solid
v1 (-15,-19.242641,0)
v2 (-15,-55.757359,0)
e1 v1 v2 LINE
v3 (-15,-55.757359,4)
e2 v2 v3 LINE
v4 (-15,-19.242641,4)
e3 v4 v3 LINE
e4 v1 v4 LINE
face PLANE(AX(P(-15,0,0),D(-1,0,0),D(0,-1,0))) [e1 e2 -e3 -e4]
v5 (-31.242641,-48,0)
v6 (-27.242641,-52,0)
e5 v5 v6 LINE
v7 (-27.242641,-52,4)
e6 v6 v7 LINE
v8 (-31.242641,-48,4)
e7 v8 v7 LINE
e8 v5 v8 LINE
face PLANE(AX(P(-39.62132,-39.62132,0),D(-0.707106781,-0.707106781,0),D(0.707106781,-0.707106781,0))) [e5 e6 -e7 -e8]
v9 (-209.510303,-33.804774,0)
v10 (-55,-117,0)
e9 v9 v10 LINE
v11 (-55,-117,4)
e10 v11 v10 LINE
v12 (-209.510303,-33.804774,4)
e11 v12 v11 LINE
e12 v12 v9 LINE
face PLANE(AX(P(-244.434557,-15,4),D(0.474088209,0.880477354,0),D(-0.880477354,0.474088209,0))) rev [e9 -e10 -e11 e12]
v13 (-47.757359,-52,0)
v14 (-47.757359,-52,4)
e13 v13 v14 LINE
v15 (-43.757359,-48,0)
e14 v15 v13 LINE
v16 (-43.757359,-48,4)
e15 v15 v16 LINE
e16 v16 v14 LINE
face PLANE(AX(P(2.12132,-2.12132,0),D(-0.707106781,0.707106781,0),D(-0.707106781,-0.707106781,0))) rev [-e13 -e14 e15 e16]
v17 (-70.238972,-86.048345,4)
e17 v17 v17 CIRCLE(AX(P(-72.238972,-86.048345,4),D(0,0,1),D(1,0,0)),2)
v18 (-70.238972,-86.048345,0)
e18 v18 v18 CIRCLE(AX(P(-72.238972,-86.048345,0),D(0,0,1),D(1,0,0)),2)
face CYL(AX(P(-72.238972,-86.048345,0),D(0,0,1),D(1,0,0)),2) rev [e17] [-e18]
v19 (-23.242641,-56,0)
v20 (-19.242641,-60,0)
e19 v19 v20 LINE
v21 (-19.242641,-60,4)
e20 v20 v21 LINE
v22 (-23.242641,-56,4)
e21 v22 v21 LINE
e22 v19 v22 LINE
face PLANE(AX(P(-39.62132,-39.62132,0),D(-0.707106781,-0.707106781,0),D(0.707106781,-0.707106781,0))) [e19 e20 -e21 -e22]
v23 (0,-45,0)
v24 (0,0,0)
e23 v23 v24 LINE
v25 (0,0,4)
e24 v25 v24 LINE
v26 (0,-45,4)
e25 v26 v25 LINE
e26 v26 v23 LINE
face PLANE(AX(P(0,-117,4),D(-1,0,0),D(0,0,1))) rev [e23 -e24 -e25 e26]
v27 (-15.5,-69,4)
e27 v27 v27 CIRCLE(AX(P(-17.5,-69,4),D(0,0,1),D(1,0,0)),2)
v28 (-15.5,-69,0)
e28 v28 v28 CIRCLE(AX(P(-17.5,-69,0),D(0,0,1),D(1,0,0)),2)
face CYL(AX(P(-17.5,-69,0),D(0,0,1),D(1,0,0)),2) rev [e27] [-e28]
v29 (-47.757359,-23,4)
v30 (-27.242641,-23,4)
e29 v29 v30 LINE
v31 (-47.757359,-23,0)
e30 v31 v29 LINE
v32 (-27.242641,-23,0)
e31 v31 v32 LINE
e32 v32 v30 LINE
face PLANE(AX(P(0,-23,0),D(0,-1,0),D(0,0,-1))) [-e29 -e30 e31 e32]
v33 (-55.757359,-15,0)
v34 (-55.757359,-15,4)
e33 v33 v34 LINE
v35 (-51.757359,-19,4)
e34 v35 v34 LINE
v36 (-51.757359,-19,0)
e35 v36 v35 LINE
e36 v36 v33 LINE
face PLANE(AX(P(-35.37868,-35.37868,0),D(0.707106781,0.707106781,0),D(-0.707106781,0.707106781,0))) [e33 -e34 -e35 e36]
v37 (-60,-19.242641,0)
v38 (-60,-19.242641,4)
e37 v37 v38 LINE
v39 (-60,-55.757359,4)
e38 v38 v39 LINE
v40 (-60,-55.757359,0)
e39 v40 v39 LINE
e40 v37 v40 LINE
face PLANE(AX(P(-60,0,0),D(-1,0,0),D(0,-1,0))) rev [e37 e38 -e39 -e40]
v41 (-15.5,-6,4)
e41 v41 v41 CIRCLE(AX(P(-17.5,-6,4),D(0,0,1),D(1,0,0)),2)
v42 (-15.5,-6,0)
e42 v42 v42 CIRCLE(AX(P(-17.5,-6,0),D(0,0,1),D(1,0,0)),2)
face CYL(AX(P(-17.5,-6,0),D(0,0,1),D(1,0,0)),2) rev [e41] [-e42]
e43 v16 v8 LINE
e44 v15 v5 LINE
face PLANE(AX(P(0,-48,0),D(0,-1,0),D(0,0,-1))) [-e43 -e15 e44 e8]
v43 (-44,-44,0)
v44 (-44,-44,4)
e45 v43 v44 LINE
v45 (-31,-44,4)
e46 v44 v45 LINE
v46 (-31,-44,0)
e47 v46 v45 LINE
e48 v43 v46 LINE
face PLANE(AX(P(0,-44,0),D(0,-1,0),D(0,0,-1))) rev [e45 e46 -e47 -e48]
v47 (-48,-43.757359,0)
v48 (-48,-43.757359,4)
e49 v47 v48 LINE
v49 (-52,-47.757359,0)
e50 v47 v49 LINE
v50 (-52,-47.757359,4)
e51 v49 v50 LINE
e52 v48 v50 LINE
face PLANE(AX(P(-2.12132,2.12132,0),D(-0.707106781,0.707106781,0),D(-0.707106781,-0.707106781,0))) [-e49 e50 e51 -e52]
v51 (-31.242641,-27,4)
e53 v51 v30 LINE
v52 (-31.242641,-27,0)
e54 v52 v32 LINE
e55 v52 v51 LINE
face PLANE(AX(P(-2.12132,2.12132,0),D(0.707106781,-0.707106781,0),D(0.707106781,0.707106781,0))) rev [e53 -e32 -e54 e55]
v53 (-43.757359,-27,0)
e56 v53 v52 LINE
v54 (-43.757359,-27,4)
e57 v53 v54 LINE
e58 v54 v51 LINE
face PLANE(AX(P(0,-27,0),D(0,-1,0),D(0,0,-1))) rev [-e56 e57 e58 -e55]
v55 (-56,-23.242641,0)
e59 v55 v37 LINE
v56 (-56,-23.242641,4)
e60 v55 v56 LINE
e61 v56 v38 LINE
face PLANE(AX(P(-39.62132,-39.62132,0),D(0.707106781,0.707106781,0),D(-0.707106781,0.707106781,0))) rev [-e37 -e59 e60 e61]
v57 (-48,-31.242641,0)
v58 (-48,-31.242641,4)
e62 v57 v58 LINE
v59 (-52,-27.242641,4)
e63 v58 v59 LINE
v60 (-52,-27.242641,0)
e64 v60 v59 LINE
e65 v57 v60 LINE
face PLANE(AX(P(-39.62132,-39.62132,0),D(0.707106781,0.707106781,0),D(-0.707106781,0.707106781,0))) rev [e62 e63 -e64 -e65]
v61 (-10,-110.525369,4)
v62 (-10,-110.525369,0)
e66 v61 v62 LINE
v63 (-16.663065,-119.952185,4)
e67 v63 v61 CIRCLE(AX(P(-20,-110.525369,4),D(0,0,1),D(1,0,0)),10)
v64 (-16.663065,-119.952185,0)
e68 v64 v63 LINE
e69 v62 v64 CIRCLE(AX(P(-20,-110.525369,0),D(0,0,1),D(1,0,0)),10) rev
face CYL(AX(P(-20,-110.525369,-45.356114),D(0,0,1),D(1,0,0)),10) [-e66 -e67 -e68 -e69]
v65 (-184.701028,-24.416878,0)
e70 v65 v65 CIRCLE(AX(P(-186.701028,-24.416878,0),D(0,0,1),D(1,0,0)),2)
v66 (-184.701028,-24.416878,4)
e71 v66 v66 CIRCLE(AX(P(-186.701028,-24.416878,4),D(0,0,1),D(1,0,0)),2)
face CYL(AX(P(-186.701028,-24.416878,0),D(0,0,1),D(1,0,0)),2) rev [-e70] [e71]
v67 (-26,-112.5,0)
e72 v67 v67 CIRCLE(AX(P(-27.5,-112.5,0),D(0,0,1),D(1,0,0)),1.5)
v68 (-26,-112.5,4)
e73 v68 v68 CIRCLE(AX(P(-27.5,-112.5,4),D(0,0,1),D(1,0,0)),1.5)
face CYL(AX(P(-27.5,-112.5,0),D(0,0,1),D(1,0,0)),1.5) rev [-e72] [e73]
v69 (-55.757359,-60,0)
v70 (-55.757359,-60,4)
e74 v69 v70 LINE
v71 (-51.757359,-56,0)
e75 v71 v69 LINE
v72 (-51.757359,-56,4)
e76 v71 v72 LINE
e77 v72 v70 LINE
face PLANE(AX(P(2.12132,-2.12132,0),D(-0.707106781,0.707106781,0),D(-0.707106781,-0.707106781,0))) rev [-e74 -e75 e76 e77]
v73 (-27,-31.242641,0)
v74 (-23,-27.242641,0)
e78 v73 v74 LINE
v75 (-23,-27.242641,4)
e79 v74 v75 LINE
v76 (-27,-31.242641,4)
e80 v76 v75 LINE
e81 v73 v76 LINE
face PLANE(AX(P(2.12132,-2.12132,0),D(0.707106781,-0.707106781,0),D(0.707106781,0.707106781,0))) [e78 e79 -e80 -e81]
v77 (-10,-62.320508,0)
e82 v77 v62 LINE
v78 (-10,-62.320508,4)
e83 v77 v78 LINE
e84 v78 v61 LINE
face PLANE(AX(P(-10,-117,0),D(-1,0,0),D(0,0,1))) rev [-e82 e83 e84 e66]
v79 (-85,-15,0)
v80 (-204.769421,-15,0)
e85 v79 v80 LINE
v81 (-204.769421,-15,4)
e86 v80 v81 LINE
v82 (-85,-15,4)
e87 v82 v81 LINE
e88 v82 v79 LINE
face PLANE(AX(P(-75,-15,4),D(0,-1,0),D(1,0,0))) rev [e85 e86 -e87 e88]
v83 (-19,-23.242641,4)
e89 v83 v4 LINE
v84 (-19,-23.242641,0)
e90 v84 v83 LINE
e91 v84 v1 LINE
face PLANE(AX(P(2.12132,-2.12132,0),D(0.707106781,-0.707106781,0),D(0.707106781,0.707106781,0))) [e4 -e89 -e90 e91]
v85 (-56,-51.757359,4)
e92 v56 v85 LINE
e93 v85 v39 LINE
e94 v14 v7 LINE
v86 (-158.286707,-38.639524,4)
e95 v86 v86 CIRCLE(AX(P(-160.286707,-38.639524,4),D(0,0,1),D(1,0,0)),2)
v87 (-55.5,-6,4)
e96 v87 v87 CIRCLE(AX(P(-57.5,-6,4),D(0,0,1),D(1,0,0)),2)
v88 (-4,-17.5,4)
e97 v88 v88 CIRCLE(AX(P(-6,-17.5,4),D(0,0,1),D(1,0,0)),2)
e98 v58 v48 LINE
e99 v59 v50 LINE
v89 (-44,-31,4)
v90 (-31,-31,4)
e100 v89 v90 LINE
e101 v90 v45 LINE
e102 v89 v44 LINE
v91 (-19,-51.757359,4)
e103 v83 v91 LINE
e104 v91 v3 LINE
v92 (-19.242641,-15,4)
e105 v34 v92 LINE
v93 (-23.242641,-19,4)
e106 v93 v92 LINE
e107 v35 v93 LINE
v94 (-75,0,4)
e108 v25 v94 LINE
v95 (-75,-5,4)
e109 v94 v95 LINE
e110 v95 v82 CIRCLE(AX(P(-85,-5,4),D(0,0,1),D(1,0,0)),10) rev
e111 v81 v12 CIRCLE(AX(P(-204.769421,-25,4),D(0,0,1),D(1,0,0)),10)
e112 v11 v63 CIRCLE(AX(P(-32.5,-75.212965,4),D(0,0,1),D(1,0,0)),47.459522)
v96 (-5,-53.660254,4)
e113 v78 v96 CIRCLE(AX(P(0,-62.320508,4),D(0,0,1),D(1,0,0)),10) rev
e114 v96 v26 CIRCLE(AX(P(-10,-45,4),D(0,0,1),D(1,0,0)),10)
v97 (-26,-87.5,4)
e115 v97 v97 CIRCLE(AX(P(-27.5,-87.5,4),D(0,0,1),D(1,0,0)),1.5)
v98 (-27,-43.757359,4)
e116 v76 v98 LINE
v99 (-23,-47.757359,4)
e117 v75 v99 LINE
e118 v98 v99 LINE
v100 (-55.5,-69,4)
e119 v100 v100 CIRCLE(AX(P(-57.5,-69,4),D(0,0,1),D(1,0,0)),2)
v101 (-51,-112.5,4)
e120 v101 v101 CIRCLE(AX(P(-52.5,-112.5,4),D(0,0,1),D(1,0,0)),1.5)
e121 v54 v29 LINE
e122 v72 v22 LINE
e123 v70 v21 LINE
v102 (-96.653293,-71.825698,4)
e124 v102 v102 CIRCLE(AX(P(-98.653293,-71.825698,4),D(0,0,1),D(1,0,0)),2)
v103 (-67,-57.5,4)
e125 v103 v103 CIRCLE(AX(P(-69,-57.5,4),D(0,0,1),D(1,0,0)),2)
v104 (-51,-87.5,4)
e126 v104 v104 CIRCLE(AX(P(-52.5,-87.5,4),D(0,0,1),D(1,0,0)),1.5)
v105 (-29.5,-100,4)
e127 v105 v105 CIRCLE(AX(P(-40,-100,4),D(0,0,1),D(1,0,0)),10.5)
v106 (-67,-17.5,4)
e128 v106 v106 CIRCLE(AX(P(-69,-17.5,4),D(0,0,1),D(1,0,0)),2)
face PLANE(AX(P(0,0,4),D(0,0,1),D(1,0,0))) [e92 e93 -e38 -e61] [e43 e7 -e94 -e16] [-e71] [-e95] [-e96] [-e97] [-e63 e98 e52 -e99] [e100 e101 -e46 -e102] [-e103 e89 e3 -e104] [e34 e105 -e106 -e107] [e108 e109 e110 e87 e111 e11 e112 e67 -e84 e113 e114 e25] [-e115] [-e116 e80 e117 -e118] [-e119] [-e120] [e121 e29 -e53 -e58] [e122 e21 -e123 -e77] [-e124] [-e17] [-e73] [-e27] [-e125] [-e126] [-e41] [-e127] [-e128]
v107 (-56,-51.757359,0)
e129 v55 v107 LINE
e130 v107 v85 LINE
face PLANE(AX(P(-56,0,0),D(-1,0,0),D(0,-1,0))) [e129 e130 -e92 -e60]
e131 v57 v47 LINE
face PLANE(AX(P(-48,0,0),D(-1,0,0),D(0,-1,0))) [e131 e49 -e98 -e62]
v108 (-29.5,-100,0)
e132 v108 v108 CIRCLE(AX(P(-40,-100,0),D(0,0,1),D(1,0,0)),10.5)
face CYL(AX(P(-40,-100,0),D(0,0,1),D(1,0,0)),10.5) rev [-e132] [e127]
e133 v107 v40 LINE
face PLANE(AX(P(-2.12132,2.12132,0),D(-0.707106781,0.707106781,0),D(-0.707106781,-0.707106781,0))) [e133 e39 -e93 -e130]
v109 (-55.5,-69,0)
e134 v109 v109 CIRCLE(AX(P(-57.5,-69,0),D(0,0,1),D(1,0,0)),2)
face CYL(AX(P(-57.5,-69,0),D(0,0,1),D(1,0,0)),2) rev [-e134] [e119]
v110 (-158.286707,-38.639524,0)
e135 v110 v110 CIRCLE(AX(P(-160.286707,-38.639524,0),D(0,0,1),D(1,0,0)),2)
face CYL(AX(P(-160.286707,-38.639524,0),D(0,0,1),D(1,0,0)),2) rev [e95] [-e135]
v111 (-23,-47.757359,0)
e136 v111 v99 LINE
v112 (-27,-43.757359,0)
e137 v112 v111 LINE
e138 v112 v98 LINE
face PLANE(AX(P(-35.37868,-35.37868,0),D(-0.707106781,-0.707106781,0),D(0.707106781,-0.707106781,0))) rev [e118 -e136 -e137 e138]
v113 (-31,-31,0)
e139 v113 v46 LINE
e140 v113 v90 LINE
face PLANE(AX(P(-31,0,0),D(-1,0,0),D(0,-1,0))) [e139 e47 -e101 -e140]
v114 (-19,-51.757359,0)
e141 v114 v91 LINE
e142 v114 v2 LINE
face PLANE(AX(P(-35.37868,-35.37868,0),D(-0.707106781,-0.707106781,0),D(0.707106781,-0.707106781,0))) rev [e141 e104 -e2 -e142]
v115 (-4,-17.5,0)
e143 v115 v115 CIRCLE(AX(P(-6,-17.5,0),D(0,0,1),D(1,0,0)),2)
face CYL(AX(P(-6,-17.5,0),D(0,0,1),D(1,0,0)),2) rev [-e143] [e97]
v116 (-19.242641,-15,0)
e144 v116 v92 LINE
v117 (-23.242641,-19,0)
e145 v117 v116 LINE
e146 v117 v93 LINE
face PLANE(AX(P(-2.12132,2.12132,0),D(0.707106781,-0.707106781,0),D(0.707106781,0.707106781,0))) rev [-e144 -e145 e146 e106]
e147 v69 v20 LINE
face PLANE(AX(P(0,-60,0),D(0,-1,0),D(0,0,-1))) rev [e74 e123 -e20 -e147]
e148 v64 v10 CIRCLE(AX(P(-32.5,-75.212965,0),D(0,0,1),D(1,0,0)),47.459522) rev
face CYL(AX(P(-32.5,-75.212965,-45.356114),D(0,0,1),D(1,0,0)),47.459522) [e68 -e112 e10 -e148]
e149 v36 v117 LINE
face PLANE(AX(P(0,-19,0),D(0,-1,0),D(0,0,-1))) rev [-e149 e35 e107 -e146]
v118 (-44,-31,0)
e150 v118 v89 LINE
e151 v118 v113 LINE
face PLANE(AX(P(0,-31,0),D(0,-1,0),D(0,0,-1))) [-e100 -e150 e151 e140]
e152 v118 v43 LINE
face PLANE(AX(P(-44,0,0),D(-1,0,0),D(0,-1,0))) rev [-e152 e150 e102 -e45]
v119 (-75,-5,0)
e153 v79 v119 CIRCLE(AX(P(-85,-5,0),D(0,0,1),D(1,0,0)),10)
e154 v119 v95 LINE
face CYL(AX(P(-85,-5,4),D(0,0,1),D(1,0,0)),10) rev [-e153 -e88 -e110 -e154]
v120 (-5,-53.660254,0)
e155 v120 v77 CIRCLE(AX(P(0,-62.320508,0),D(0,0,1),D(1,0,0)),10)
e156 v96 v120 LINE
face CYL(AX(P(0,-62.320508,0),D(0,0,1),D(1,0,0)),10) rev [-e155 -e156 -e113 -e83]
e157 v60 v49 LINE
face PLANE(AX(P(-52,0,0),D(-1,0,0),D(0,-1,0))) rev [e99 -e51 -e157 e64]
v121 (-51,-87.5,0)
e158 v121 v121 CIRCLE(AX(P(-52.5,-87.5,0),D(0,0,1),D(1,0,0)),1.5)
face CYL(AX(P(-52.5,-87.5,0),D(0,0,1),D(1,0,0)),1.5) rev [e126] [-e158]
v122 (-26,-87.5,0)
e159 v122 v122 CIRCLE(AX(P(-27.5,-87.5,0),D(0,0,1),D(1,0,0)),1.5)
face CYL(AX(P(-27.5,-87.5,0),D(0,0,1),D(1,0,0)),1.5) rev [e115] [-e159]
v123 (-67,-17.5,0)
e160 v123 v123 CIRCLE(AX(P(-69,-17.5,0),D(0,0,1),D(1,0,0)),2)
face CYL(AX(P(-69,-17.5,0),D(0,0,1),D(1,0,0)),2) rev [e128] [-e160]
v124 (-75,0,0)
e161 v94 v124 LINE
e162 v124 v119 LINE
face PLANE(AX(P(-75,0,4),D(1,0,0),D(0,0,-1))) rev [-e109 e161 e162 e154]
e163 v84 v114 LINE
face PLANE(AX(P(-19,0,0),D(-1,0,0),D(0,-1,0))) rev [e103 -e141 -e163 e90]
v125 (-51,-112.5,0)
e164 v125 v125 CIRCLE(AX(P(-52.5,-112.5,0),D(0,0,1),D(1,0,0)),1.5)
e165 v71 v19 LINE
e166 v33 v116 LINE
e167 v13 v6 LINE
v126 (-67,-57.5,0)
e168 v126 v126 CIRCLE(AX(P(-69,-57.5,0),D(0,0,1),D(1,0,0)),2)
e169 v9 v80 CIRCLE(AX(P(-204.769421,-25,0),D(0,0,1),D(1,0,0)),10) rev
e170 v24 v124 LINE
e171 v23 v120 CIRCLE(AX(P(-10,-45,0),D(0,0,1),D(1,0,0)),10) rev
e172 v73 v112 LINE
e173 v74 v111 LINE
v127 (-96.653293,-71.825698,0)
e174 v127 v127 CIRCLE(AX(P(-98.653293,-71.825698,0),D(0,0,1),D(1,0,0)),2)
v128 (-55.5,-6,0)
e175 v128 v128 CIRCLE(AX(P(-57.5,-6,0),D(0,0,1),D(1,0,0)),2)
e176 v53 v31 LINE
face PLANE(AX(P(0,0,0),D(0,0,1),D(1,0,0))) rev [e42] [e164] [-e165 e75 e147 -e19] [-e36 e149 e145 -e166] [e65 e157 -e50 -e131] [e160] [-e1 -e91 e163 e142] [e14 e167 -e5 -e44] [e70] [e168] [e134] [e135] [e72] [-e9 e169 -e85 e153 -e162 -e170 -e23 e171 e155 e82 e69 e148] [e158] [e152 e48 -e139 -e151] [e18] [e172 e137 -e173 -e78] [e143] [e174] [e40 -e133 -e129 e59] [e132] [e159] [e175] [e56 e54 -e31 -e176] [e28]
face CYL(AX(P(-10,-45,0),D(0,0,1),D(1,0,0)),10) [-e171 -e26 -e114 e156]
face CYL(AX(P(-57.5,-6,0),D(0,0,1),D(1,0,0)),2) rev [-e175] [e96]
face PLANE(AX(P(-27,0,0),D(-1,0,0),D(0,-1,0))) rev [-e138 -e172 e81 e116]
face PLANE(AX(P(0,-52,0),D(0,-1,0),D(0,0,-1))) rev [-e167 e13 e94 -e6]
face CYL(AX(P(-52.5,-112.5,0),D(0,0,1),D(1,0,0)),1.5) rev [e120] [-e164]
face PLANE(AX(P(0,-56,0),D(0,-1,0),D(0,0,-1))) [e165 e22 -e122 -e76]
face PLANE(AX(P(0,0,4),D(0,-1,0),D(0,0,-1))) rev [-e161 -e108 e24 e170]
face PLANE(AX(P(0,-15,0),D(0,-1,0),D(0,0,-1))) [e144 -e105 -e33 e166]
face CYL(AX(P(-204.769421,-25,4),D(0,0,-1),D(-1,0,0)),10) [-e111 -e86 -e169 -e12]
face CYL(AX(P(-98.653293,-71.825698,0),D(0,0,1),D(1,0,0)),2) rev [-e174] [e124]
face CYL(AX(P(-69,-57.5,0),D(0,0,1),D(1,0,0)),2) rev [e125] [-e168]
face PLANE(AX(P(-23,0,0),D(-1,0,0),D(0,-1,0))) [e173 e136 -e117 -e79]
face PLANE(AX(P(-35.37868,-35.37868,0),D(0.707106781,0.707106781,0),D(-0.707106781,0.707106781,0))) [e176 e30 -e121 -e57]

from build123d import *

# Parameters (mm, degrees)
EXTRUDE_1_DEPTH     = 4
SKETCH_3_R          = 2
CUT_EXTRUDE_1_DEPTH = 272.02260581
SKETCH_4_R          = 10.5
SKETCH_4_R_2        = 1.5
CUT_EXTRUDE_2_DEPTH = 272.02260581
SKETCH_5_R          = 2
CUT_EXTRUDE_3_DEPTH = 272.02260581
SKETCH_6_W          = 10
SKETCH_6_H          = 62
CUT_EXTRUDE_4_DEPTH = 272.02260581
FILLET_1_R          = 10
SKETCH_7_W          = 13
SKETCH_7_H          = 13
CUT_EXTRUDE_5_DEPTH = 4
EXTRUDE_2_DEPTH     = 4
FILLET_2_R          = 10


with BuildPart() as part:
    # 草图2 → 凸台-拉伸1 (new body)
    with BuildSketch(Plane.XY):
        Polygon((0, 0), (-75, 0), (-75, -15), (-244.434557418, -15), (-55, -117), (0, -117), align=None)
    extrude(amount=EXTRUDE_1_DEPTH)

    # 草图3 → 切除-拉伸1 (cut, through all)
    with BuildSketch(Plane.XY.offset(4)):
        with Locations((-57.5, -6)):
            Circle(SKETCH_3_R)
        with Locations((-69, -17.5)):
            Circle(SKETCH_3_R)
        with Locations((-17.5, -6)):
            Circle(SKETCH_3_R)
        with Locations((-6, -17.5)):
            Circle(SKETCH_3_R)
        with Locations((-6, -57.5)):
            Circle(SKETCH_3_R)
        with Locations((-17.5, -69)):
            Circle(SKETCH_3_R)
        with Locations((-57.5, -69)):
            Circle(SKETCH_3_R)
        with Locations((-69, -57.5)):
            Circle(SKETCH_3_R)
    extrude(amount=-CUT_EXTRUDE_1_DEPTH, mode=Mode.SUBTRACT)

    # 草图4 → 切除-拉伸2 (cut, through all)
    with BuildSketch(Plane.XY.offset(4)):
        with Locations((-40, -100)):
            Circle(SKETCH_4_R)
        with Locations((-52.5, -112.5)):
            Circle(SKETCH_4_R_2)
        with Locations((-27.5, -112.5)):
            Circle(SKETCH_4_R_2)
        with Locations((-27.5, -87.5)):
            Circle(SKETCH_4_R_2)
        with Locations((-52.5, -87.5)):
            Circle(SKETCH_4_R_2)
    extrude(amount=-CUT_EXTRUDE_2_DEPTH, mode=Mode.SUBTRACT)

    # 草图5 → 切除-拉伸3 (cut, through all)
    with BuildSketch(Plane.XY.offset(4)):
        with Locations((-98.653292605, -71.825698472)):
            Circle(SKETCH_5_R)
        with Locations((-72.238972, -86.048344744)):
            Circle(SKETCH_5_R)
        with Locations((-160.286707351, -38.639523839)):
            Circle(SKETCH_5_R)
        with Locations((-186.701027956, -24.416877568)):
            Circle(SKETCH_5_R)
    extrude(amount=-CUT_EXTRUDE_3_DEPTH, mode=Mode.SUBTRACT)

    # 草图6 → 切除-拉伸4 (cut, through all)
    with BuildSketch(Plane.XY.offset(4)):
        with Locations((-5, -86)):
            Rectangle(SKETCH_6_W, SKETCH_6_H)
    extrude(amount=-CUT_EXTRUDE_4_DEPTH, mode=Mode.SUBTRACT)

    # 圆角1
    fillet_1_edges = [part.edges().sort_by_distance(p)[0] for p in [
        (0, -55, 2),
    ]]
    fillet(fillet_1_edges, radius=FILLET_1_R - 0.0001)  # a hair under: the kernel refuses the full size

    # 草图7 → 切除-拉伸5 (cut)
    with BuildSketch(Plane.XY.offset(4)):
        Polygon((-19.242640687, -15), (-55.757359313, -15), (-51.757359313, -19), (-23.242640687, -19), align=None)
        Polygon((-56, -23.242640687), (-60, -19.242640687), (-60, -55.757359313), (-56, -51.757359313), align=None)
        Polygon((-51.757359313, -56), (-55.757359313, -60), (-19.242640687, -60), (-23.242640687, -56), align=None)
        Polygon((-15, -55.757359313), (-15, -19.242640687), (-19, -23.242640687), (-19, -51.757359313), align=None)
        Polygon((-27.242640687, -23), (-47.757359313, -23), (-43.757359313, -27), (-31.242640687, -27), align=None)
        Polygon((-48, -31.242640687), (-52, -27.242640687), (-52, -47.757359313), (-48, -43.757359313), align=None)
        Polygon((-43.757359313, -48), (-47.757359313, -52), (-27.242640687, -52), (-31.242640687, -48), align=None)
        Polygon((-23, -47.757359313), (-23, -27.242640687), (-27, -31.242640687), (-27, -43.757359313), align=None)
        with Locations((-37.5, -37.5)):
            Rectangle(SKETCH_7_W, SKETCH_7_H)
    extrude(amount=-CUT_EXTRUDE_5_DEPTH, mode=Mode.SUBTRACT)

    # 草图8 → 凸台-拉伸2 (add)
    with BuildSketch(Plane.XY.offset(4)):
        with BuildLine():
            Line((-10, -117), (-55, -117))
            ThreePointArc((-55, -117), (-32.5, -122.672487724), (-10, -117))
        make_face()
    extrude(amount=-EXTRUDE_2_DEPTH)

    # 圆角2
    fillet_2_edges = [part.edges().sort_by_distance(p)[0] for p in [
        (-10, -117, 2),
        (-10, -55, 2),
        (-244.434557418, -15, 2),
        (-75, -15, 2),
    ]]
    fillet(fillet_2_edges, radius=FILLET_2_R)


solid = part.part
